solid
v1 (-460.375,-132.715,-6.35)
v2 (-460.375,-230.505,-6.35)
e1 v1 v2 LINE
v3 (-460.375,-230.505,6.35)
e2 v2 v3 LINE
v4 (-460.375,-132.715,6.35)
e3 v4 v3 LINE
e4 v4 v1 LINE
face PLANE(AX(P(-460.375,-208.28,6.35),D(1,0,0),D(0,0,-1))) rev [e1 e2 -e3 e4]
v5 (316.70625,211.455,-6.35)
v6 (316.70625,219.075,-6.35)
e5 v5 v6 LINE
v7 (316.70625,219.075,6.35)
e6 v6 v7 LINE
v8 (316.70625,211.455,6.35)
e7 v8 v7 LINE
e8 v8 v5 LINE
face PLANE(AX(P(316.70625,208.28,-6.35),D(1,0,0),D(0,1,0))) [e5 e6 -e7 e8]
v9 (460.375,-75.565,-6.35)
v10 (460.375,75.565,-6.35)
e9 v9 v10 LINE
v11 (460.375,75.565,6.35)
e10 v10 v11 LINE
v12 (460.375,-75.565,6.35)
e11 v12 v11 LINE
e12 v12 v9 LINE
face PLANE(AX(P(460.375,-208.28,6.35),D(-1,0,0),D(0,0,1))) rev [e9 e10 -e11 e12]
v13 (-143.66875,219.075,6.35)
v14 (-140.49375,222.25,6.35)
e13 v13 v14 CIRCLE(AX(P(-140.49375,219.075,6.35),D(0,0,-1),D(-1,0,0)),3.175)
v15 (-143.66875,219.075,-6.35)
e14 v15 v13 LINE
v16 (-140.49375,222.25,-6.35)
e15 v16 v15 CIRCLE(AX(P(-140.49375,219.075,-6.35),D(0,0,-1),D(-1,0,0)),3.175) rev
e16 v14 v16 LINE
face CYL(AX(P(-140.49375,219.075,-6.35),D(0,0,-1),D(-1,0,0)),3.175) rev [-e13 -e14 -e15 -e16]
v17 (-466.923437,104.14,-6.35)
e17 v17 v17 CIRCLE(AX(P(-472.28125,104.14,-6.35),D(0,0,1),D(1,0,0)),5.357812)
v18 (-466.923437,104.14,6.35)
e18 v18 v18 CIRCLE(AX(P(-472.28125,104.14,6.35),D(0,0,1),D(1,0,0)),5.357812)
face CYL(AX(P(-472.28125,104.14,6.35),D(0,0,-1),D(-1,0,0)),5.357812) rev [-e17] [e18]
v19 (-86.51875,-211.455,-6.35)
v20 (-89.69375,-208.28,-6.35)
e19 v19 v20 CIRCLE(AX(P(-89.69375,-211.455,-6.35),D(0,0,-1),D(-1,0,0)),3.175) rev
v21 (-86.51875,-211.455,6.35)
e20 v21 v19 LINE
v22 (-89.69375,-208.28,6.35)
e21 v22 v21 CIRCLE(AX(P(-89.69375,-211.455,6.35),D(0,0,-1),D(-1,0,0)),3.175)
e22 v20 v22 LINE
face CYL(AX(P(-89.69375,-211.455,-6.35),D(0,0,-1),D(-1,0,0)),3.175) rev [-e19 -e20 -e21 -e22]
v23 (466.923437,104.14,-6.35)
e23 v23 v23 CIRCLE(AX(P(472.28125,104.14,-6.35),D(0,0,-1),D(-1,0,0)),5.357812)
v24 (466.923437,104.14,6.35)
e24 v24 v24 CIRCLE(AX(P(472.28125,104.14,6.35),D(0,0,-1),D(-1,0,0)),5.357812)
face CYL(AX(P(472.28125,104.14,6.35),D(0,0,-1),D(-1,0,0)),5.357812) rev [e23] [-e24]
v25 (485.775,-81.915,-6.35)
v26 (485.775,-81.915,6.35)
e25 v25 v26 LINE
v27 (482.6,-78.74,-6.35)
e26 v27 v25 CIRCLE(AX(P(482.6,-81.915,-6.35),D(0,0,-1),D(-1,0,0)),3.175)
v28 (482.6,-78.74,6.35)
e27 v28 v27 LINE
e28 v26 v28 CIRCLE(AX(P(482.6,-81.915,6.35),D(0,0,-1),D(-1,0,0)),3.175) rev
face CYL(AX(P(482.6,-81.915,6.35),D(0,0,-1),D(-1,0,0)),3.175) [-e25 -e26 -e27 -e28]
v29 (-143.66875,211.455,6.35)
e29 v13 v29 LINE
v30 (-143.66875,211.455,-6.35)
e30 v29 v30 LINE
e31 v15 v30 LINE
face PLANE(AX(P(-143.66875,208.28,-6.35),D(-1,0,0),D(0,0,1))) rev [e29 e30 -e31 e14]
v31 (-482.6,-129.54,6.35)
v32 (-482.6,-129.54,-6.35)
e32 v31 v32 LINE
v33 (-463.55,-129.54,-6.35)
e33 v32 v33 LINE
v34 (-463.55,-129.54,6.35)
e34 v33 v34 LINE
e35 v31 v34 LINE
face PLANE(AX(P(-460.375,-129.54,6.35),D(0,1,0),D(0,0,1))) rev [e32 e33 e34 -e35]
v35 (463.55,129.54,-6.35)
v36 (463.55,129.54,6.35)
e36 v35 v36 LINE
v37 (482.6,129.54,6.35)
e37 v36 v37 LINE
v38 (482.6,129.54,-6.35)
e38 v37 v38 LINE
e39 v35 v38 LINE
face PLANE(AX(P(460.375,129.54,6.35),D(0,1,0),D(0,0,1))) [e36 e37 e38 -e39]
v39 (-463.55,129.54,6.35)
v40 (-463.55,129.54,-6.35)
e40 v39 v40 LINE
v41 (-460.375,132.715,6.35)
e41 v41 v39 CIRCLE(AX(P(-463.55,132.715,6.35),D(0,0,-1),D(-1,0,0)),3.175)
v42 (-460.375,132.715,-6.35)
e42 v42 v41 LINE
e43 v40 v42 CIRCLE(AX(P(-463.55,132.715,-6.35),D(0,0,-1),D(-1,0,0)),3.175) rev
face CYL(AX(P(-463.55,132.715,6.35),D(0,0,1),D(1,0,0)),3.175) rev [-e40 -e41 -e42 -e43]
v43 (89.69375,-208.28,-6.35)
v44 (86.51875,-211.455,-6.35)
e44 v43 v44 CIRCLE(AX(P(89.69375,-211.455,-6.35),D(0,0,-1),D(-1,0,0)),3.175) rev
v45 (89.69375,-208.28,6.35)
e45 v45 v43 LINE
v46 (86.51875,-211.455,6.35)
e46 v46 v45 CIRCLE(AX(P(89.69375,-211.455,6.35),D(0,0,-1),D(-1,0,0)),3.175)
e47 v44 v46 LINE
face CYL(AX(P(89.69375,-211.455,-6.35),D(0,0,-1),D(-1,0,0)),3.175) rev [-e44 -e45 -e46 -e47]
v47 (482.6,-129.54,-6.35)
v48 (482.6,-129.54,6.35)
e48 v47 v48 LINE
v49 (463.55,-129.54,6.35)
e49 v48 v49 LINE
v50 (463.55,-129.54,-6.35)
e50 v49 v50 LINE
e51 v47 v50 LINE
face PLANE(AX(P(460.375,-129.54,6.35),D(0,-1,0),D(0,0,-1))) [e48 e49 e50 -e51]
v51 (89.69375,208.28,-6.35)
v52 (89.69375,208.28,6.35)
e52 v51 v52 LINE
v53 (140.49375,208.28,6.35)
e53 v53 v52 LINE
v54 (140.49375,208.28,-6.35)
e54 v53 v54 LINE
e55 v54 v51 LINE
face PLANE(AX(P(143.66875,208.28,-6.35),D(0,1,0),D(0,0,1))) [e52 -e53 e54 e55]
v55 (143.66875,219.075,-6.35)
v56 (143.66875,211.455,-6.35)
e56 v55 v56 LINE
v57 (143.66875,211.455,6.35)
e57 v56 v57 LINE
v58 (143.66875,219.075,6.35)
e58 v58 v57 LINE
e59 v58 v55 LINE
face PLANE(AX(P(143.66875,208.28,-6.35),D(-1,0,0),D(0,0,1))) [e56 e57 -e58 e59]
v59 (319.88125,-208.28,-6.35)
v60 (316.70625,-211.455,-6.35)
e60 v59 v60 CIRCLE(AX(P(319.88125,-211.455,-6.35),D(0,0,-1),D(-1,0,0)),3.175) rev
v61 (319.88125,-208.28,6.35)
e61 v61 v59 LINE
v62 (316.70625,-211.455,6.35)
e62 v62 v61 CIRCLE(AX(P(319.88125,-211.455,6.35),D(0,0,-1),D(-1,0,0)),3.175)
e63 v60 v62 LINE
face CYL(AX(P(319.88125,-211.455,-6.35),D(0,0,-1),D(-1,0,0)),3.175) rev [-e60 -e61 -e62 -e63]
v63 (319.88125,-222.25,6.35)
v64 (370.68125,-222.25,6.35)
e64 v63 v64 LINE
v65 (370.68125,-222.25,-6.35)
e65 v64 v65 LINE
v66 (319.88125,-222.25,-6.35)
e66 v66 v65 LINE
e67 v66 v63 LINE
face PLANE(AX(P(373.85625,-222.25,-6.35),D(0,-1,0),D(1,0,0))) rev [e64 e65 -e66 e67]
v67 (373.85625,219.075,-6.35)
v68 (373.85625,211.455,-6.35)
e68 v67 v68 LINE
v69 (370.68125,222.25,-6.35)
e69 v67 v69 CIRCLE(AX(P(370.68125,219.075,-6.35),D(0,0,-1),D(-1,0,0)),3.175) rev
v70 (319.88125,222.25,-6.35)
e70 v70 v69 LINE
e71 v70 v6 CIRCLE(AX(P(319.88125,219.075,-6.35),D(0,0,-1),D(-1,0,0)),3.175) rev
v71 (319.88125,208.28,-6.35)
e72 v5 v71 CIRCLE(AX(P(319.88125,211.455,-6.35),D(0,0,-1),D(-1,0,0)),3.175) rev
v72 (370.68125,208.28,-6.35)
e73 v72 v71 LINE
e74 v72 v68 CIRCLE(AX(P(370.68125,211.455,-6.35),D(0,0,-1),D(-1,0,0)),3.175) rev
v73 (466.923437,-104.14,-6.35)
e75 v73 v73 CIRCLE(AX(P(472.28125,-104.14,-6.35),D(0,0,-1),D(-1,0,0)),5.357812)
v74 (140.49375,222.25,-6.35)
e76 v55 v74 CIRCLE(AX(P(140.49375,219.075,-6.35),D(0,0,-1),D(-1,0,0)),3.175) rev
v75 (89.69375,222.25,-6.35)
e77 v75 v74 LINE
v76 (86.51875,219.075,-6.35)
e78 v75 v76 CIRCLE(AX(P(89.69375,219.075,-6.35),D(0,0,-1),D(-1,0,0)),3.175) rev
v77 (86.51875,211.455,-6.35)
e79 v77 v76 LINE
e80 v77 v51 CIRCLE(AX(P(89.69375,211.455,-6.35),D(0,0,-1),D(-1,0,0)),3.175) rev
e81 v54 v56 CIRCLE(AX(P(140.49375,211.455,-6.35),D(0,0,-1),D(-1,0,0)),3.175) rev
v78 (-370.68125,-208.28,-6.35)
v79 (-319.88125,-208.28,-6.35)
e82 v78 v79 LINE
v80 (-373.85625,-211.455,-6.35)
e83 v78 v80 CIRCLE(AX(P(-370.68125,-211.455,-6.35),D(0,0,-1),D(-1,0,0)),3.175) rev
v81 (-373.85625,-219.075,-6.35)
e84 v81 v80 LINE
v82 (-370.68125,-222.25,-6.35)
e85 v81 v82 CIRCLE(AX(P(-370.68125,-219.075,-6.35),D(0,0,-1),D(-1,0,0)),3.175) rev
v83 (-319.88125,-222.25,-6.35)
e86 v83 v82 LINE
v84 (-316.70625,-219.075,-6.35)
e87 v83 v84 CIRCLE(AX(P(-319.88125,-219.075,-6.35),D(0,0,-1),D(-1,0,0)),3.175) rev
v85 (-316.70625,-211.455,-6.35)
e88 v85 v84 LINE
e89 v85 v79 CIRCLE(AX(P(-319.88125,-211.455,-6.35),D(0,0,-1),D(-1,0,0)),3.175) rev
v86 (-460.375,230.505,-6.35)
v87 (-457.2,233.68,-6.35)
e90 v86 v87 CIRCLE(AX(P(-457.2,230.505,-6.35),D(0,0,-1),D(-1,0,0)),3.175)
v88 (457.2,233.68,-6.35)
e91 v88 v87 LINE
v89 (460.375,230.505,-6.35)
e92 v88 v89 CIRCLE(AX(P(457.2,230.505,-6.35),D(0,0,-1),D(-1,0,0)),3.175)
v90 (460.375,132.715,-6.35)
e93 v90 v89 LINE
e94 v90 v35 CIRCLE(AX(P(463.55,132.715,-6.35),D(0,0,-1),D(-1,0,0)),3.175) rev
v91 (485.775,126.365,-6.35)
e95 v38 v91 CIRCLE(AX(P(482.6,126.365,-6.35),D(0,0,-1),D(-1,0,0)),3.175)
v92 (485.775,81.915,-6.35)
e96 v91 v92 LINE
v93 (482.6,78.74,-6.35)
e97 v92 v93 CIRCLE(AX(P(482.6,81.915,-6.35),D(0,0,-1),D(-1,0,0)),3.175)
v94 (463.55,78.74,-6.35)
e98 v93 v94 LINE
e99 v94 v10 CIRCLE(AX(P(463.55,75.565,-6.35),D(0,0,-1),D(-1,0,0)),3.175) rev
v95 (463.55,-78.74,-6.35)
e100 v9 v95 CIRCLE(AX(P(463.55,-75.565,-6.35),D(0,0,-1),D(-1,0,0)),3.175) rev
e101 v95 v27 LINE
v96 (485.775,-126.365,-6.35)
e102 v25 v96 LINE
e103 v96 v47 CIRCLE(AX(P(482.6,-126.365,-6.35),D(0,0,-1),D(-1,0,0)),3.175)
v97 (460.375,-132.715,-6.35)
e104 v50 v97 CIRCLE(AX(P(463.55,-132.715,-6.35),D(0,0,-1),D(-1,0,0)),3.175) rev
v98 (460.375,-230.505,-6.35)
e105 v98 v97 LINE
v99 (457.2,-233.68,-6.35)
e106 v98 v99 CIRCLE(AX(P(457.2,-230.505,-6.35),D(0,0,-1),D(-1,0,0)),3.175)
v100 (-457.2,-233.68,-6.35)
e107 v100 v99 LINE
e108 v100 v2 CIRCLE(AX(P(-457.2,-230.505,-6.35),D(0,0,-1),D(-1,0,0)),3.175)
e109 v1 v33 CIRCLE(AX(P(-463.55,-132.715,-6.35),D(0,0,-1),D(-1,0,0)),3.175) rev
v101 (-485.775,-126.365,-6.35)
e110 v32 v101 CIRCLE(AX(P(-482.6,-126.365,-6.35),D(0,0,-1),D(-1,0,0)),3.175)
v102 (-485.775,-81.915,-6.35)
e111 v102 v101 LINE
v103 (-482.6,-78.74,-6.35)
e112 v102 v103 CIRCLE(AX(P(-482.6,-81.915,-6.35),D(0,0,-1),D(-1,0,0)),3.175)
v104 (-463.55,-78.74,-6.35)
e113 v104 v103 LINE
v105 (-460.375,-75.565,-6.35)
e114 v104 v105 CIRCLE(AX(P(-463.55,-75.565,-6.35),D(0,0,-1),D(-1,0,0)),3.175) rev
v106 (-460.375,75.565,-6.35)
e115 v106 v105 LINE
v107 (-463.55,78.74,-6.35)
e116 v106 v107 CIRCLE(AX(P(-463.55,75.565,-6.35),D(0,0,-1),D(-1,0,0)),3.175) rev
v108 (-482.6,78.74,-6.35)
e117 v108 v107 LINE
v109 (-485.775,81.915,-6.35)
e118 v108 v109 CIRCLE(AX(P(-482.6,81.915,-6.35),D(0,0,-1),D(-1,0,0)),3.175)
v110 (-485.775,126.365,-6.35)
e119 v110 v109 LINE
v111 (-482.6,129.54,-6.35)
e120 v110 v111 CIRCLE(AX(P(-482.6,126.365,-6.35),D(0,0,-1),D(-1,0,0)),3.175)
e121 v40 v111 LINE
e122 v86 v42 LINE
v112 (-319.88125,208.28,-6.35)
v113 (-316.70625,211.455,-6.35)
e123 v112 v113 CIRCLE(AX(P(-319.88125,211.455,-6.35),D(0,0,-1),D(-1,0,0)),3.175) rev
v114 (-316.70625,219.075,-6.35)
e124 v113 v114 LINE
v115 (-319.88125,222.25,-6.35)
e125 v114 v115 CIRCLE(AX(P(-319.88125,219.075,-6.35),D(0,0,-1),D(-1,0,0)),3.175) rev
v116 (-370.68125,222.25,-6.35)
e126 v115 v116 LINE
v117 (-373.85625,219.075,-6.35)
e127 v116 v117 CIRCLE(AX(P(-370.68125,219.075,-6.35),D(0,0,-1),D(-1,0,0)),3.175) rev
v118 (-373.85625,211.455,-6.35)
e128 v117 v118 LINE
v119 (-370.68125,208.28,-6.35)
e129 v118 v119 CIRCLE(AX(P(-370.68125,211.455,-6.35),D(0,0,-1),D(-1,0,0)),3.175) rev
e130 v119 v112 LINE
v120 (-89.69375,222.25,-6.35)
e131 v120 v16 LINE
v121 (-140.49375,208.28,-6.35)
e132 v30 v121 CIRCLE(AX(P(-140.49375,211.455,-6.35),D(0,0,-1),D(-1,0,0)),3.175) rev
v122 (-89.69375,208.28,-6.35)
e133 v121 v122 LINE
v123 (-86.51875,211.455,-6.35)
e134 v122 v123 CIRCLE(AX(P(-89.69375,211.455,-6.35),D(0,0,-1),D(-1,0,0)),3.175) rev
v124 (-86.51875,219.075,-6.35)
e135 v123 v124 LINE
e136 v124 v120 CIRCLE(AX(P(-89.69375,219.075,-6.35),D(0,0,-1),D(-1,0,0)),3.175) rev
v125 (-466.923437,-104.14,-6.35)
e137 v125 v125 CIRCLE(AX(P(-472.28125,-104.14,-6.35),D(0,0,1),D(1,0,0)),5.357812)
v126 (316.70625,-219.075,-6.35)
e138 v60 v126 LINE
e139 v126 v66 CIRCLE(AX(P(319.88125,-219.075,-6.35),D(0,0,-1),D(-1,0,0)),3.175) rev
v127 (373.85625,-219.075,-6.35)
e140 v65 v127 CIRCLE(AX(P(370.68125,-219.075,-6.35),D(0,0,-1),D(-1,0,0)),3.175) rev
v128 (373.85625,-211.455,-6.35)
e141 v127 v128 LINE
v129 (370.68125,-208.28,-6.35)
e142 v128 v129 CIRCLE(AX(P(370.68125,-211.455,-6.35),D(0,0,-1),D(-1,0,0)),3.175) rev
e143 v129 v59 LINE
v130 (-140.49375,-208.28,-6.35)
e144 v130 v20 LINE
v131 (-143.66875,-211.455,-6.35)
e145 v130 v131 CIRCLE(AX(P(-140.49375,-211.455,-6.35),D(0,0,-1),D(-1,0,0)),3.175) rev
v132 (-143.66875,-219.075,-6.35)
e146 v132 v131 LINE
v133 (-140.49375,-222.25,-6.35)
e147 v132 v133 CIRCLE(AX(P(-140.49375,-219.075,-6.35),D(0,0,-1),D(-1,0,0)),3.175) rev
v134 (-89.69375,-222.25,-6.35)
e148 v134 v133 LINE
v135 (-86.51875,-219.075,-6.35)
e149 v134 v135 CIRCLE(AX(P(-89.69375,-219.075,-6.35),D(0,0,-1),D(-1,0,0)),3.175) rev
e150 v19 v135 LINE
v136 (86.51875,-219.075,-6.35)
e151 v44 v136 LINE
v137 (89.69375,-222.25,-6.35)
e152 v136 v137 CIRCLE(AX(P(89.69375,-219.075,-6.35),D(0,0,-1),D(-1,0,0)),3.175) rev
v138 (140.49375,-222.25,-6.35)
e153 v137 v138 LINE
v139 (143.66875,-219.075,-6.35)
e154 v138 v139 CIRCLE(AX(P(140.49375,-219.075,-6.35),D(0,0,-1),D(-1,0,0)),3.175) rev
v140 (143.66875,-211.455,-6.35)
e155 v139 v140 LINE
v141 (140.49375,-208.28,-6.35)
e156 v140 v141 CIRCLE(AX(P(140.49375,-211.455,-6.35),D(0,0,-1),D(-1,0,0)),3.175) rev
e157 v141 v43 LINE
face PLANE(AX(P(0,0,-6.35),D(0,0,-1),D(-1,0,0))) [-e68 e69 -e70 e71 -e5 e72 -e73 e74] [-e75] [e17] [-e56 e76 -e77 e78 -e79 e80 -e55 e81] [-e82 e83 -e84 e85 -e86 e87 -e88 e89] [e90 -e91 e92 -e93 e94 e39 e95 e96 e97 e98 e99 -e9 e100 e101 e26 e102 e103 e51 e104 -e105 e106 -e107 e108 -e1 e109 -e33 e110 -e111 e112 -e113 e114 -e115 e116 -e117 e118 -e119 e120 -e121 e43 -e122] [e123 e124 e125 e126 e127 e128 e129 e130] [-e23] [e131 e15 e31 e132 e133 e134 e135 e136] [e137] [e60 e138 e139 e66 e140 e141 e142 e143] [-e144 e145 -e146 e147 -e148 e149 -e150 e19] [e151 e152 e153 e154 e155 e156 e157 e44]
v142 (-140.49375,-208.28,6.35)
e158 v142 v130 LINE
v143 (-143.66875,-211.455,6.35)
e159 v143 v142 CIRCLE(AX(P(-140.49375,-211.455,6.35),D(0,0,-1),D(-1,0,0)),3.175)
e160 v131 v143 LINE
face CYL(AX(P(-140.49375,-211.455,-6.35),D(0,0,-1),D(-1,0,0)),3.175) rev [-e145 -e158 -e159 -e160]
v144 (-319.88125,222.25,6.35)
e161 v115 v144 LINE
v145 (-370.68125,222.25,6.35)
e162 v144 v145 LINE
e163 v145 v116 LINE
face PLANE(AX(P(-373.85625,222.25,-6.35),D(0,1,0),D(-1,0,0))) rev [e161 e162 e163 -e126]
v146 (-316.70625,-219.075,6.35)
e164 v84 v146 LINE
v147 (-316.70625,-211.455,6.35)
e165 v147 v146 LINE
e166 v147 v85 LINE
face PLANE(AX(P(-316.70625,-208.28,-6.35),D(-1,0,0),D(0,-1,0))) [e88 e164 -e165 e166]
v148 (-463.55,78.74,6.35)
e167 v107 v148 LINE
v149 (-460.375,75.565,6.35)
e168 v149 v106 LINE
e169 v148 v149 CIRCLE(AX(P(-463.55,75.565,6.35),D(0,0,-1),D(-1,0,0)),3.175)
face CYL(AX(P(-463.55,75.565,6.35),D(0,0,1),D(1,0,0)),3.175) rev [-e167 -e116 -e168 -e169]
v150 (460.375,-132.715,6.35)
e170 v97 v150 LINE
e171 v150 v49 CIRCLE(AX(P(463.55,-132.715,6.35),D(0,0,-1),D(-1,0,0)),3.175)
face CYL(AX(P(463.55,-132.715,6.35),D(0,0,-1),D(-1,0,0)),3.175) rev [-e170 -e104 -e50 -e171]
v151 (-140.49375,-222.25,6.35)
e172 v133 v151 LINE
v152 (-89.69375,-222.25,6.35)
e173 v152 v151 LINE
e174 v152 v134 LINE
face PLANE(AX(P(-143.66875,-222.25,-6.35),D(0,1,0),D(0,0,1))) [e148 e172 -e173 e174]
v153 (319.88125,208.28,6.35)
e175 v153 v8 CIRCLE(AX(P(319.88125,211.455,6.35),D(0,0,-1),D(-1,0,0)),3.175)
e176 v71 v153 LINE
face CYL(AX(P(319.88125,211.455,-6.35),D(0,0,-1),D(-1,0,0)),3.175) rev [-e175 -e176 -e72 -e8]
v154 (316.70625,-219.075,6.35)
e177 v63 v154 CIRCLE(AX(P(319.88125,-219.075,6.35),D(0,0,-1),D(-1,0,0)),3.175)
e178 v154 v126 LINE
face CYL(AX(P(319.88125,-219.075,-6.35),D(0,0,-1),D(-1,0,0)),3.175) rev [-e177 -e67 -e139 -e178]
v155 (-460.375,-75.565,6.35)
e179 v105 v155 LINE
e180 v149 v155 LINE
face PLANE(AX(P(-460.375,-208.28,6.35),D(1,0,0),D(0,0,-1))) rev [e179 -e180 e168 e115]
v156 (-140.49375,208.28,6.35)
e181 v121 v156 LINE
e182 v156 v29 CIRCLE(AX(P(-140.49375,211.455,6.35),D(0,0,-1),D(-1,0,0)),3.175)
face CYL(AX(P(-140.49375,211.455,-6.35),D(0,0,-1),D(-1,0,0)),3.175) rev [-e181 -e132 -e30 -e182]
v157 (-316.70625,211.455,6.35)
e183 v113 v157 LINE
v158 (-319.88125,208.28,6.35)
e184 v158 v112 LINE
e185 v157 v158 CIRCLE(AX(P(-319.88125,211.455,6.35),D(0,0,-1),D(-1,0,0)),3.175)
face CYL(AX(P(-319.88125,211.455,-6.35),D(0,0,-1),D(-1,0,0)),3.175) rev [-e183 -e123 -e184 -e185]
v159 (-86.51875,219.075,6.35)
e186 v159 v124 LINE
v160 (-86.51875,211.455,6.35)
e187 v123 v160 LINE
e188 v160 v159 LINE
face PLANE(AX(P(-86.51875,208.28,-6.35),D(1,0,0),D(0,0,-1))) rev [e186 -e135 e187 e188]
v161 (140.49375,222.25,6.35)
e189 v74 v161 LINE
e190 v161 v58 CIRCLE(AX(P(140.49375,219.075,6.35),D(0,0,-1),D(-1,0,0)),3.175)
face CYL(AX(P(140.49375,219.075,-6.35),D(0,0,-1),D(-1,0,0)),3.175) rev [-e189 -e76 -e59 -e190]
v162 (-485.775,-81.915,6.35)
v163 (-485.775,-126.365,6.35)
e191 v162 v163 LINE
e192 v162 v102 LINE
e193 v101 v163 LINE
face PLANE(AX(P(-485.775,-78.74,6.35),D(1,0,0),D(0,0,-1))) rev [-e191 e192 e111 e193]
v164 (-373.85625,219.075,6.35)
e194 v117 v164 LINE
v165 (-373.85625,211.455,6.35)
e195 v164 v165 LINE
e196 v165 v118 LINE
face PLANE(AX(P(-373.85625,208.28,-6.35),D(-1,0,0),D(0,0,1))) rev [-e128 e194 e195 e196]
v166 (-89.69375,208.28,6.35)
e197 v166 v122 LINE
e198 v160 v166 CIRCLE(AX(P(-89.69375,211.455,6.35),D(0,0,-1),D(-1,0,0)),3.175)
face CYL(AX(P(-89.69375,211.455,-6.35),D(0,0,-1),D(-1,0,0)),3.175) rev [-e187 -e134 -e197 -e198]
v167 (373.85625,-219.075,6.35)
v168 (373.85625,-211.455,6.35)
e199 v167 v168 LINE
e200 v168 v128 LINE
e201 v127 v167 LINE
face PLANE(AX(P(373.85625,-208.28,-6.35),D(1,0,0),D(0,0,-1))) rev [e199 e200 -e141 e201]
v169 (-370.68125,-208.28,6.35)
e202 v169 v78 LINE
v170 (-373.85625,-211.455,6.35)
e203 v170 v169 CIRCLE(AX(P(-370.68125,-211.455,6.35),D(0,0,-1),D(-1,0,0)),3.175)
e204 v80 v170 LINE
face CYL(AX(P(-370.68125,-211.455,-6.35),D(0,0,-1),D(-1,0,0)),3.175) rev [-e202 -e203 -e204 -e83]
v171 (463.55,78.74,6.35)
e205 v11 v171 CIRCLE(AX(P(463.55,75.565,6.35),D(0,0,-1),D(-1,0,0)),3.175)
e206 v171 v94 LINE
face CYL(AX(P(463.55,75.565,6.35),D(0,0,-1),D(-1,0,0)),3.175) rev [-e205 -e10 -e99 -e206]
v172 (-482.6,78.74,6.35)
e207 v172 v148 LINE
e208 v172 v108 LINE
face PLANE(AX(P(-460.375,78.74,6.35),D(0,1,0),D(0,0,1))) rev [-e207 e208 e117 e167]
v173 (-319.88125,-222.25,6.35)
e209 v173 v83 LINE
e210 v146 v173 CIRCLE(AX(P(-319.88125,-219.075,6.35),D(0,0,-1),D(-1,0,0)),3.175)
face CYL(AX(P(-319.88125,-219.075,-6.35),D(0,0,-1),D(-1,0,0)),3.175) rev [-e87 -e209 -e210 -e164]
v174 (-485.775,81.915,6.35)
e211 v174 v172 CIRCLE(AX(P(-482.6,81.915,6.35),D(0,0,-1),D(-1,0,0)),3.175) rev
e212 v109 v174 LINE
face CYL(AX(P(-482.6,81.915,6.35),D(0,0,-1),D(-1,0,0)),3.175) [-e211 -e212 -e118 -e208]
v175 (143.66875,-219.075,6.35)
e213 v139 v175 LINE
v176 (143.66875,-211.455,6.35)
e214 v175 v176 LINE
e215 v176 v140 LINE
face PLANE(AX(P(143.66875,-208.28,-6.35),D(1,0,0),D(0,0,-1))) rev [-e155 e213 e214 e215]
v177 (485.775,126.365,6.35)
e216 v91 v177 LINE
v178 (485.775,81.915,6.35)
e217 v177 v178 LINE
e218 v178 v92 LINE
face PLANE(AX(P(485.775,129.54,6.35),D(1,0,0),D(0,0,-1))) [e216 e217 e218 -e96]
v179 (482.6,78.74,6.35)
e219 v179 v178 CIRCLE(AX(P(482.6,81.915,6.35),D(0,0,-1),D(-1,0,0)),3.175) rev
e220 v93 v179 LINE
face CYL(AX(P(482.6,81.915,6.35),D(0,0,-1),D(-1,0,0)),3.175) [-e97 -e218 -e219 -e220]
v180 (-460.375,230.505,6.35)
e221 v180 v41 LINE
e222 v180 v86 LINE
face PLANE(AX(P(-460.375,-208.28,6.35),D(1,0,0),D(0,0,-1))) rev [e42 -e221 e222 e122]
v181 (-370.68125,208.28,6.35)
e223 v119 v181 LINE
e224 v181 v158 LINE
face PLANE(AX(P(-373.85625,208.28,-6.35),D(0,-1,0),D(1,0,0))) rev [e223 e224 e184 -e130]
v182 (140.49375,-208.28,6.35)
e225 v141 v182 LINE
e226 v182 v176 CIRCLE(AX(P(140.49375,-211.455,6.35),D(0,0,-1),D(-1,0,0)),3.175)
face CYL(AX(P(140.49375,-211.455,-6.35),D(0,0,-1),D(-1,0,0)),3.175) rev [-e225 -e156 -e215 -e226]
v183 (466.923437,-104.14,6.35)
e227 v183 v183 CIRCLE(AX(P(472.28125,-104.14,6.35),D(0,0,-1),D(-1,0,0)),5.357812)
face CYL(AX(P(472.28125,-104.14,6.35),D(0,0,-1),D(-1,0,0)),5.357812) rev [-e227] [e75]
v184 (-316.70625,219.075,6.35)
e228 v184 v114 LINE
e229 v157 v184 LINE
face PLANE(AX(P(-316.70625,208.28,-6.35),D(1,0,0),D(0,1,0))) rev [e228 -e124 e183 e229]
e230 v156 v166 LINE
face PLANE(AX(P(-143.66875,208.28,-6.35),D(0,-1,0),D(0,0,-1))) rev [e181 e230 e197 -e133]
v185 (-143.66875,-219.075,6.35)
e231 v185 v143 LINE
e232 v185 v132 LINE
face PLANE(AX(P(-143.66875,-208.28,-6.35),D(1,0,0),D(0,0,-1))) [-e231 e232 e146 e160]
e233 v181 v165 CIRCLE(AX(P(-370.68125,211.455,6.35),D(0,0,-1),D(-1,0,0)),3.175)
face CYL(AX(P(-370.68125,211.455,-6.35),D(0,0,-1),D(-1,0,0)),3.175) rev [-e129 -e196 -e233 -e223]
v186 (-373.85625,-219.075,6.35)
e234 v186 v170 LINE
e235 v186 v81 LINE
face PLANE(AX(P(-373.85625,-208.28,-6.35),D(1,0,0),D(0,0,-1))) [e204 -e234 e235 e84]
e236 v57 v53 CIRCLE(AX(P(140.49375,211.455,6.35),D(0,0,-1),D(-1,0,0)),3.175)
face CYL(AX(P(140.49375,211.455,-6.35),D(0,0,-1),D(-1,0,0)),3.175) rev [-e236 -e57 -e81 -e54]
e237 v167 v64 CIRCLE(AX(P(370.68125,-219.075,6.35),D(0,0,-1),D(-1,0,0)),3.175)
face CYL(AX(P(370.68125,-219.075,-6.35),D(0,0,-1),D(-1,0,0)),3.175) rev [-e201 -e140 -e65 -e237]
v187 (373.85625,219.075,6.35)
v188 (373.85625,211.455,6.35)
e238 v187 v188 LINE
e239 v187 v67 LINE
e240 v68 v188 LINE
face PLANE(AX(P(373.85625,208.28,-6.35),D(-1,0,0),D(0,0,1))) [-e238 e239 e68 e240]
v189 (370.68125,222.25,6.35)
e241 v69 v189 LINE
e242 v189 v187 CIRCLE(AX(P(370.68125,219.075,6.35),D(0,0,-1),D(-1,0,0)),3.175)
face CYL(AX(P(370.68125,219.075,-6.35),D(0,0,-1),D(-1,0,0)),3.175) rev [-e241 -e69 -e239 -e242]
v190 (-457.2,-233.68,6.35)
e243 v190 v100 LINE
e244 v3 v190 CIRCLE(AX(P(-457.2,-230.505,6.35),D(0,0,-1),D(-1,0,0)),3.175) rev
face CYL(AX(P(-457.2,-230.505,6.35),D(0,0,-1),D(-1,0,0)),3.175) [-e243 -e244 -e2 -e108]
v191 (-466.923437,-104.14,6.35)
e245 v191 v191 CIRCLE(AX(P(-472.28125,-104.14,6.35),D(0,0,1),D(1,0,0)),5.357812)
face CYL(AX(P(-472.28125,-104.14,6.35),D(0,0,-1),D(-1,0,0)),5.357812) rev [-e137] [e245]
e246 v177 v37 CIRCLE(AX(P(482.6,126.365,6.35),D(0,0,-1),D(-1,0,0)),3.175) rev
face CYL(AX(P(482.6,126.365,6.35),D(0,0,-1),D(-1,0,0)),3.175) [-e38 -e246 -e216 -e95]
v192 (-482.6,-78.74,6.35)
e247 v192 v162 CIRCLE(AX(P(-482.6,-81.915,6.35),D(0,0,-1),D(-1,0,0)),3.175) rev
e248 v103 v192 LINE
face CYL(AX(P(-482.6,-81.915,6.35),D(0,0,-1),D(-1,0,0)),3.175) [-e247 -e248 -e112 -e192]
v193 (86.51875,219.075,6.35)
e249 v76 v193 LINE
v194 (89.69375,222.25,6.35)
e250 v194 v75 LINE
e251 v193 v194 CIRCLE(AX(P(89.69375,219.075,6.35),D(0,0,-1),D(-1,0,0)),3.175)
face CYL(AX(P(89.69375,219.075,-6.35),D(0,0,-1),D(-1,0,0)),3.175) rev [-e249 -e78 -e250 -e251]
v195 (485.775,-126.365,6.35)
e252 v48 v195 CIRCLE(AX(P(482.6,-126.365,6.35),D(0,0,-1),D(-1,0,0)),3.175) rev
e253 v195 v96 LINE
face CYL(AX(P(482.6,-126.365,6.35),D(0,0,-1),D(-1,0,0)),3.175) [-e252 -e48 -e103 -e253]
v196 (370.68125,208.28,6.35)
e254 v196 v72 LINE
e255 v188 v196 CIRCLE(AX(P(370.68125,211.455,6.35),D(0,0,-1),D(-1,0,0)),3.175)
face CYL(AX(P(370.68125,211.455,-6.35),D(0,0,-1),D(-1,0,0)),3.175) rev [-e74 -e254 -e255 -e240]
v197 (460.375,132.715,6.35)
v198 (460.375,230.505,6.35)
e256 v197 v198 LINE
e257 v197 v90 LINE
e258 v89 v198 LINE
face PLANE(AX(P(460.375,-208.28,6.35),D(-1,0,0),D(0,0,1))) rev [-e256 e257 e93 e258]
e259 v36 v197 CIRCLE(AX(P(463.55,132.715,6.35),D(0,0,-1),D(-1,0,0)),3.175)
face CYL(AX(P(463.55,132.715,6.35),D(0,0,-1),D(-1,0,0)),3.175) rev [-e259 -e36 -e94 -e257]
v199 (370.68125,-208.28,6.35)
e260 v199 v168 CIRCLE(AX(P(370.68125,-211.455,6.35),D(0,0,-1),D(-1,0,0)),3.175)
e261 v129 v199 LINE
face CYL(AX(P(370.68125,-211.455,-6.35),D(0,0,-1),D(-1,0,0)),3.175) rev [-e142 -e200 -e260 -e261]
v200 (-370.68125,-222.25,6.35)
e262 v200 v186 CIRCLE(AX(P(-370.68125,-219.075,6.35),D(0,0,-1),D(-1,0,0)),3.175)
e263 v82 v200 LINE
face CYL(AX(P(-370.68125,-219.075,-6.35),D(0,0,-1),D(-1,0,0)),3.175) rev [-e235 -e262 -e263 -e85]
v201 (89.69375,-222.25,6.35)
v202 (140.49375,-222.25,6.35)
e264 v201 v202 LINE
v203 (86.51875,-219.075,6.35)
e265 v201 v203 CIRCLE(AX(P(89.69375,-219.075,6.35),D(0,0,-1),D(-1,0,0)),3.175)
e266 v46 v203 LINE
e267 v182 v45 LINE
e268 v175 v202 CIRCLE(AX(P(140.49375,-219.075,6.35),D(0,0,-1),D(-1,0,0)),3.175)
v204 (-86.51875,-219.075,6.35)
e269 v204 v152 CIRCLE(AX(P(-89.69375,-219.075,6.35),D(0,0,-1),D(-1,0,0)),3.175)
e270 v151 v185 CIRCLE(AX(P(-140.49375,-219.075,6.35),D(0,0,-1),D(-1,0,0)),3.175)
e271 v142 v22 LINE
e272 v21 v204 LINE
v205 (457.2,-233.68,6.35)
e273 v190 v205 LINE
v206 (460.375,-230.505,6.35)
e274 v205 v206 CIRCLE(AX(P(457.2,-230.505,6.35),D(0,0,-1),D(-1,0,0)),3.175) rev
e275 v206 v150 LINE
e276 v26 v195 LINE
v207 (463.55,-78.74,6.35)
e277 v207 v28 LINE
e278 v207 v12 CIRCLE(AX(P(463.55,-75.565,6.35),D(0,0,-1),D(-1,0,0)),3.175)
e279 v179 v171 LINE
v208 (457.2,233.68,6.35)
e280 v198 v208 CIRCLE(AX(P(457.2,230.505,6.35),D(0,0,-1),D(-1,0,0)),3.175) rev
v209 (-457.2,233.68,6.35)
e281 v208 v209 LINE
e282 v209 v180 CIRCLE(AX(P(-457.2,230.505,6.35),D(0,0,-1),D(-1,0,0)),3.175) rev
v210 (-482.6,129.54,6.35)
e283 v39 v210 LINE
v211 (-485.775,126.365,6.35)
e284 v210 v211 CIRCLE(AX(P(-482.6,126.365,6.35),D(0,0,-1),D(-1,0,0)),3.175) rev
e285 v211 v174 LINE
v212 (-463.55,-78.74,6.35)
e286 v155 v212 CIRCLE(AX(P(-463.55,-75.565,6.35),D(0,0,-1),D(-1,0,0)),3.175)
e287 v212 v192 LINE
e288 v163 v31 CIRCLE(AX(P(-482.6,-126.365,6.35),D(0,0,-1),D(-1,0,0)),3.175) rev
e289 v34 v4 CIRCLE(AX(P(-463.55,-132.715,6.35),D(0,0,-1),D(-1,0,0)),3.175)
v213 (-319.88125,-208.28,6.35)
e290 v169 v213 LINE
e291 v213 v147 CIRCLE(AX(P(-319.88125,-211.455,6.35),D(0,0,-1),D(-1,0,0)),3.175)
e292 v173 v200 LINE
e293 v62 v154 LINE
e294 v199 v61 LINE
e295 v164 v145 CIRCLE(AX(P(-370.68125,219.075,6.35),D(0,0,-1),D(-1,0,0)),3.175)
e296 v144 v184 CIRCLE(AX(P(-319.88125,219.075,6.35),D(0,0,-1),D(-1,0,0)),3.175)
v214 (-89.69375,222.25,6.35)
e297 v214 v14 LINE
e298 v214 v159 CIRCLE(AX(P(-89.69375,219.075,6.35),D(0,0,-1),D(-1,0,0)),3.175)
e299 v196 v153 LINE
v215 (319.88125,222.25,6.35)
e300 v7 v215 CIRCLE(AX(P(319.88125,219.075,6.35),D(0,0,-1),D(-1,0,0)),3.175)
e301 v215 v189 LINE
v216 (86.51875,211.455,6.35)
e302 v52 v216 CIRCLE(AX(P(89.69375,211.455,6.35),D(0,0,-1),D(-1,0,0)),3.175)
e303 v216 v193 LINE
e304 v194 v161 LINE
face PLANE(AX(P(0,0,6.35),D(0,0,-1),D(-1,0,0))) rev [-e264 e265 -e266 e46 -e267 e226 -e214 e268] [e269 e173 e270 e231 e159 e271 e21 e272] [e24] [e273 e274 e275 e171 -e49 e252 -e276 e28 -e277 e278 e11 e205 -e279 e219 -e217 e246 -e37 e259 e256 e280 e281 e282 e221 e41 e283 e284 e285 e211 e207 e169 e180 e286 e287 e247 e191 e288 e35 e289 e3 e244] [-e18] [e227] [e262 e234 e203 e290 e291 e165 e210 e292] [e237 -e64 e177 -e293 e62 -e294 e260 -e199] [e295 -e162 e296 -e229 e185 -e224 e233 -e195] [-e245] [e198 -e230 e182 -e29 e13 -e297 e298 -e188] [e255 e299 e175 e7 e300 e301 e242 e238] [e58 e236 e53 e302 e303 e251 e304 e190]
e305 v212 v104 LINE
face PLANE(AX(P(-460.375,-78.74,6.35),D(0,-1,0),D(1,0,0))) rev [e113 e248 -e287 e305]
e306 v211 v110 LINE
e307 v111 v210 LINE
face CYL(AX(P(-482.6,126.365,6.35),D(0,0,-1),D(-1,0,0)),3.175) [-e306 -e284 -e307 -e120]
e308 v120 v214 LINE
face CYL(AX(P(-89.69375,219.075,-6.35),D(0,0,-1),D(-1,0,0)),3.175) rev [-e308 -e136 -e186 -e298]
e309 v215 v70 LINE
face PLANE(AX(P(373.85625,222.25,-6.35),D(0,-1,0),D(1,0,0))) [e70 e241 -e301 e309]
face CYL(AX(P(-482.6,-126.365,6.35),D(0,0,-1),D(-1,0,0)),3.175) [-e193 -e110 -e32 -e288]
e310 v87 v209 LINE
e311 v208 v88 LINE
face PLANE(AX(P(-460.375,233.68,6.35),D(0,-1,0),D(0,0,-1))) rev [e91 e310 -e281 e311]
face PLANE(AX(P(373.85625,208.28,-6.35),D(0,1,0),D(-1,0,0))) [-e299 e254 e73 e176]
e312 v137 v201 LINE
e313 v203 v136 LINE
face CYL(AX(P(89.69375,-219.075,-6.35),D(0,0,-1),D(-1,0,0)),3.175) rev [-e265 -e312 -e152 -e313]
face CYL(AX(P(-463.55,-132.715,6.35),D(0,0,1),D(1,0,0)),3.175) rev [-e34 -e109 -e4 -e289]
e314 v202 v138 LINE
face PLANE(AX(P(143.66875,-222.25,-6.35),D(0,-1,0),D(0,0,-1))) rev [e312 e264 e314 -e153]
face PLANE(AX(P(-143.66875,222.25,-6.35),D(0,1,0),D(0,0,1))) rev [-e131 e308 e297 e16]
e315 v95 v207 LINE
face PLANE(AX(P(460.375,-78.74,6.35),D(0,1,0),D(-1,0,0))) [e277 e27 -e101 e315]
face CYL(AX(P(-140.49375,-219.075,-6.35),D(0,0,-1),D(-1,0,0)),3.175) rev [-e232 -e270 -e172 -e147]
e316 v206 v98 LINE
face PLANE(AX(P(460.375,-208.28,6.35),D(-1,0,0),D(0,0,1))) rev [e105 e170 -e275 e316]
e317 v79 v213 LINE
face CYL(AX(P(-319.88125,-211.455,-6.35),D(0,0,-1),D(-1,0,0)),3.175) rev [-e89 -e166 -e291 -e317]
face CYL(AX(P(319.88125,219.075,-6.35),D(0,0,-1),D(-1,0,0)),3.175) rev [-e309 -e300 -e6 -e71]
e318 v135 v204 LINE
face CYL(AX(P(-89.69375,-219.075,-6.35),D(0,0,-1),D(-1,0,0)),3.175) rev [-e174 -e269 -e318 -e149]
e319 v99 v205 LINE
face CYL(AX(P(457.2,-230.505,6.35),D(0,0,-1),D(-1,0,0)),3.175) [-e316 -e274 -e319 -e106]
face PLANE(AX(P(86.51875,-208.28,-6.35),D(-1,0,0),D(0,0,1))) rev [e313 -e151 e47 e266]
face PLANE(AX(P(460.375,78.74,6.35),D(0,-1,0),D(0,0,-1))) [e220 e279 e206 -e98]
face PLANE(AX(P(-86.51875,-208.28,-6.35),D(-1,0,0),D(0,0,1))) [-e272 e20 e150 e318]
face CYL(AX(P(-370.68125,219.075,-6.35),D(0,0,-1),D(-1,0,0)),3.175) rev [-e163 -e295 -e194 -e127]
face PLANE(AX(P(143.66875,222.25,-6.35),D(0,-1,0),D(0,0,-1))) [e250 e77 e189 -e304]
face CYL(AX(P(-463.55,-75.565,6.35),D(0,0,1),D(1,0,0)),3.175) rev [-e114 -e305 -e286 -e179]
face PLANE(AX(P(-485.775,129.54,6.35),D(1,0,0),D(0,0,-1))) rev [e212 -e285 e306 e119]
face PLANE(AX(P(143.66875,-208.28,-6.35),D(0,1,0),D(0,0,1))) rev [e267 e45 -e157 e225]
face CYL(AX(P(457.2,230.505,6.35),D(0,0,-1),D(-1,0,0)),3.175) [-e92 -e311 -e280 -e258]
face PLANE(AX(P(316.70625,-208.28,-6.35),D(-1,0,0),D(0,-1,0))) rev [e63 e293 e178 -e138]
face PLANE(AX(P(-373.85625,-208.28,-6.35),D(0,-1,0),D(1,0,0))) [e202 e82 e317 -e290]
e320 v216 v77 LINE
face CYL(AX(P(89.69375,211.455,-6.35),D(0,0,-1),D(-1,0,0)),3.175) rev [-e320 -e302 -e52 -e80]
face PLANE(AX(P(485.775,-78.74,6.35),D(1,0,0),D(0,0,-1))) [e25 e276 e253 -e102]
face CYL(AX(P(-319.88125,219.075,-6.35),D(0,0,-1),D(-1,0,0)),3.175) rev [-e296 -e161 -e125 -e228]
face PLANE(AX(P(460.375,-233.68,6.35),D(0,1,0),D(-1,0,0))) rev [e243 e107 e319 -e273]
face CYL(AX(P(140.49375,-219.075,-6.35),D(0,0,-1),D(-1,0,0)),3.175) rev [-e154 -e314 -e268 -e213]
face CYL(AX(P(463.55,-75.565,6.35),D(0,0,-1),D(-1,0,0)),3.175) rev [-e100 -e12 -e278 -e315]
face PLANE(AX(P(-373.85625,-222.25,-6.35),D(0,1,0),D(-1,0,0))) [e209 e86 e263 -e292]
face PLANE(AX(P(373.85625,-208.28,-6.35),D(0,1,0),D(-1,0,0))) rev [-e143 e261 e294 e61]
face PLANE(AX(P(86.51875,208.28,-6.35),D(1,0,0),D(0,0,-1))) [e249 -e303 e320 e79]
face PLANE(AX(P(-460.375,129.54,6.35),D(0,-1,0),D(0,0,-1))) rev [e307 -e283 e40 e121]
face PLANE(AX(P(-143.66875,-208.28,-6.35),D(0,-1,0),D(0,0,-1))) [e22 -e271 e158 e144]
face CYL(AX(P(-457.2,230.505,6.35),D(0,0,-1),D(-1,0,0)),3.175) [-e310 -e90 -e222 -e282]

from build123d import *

# Parameters (mm, degrees)
SKETCH1_W            = 920.75
SKETCH1_H            = 416.56
BOSS_EXTRUDE1_DEPTH  = 6.35
SKETCH2_W            = 920.75
SKETCH2_H            = 25.4
BOSS_EXTRUDE2_DEPTH  = 6.35
SKETCH3_W            = 57.15
SKETCH3_H            = 13.97
TAB_HOLES_DEPTH      = 517.442419854
SKETCH4_W            = 25.4
SKETCH4_H            = 50.8
SKETCH4_R            = 5.3578125
TABS_DEPTH           = 6.35
FILLET1_R            = 3.175
FILLET2_R            = 3.175
FILLET2_OF_MIRROR2_R = 3.175
MIRROR4_START        = -6.35
MIRROR4_DEPTH        = 12.7
MIRROR4_2_OUTLINE_R  = 5.3578125
MIRROR4_2_DEPTH      = 12.7
FILLET3_R            = 3.175


# Read off the part's stored shape, not the designer's step: Mirror4
with BuildPart() as part:
    # Sketch1 → Boss-Extrude1 (new, symmetric)
    with BuildSketch(Plane.XY):
        Rectangle(SKETCH1_W, SKETCH1_H)
    extrude(amount=BOSS_EXTRUDE1_DEPTH, both=True)

    # Sketch2 → Boss-Extrude2 (add, symmetric)
    with BuildSketch(Plane.XY):
        with Locations((0, 220.98)):
            Rectangle(SKETCH2_W, SKETCH2_H)
        with Locations((0, -220.98)):
            Rectangle(SKETCH2_W, SKETCH2_H)
    extrude(amount=BOSS_EXTRUDE2_DEPTH, both=True)

    # Sketch3 → Tab Holes (cut, through all)
    with BuildSketch(Plane.XY.offset(6.35)):
        with Locations((-345.28125, 215.265)):
            Rectangle(SKETCH3_W, SKETCH3_H)
        with Locations((-115.09375, 215.265)):
            Rectangle(SKETCH3_W, SKETCH3_H)
    tab_holes = extrude(amount=-TAB_HOLES_DEPTH, mode=Mode.SUBTRACT)

    # Sketch4 → Tabs (add, symmetric)
    # profile 1 of 2: a face of its own
    with BuildSketch(Plane.XY):
        with Locations((-473.075, 104.14)):
            Rectangle(SKETCH4_W, SKETCH4_H)
        with Locations((-472.28125, 104.14)):
            Circle(SKETCH4_R, mode=Mode.SUBTRACT)
    # profile 2 of 2: a face of its own
    with BuildSketch(Plane.XY):
        with Locations((-473.075, -104.14)):
            Rectangle(SKETCH4_W, SKETCH4_H)
        with Locations((-472.28125, -104.14)):
            Circle(SKETCH4_R, mode=Mode.SUBTRACT)
    extrude(amount=TABS_DEPTH, both=True)

    # Fillet1
    fillet1_edges = [part.edges().sort_by_distance(p)[0] for p in [
        (-460.375, 233.68, 0),
        (-460.375, -233.68, 0),
        (-460.375, 78.74, 0),
        (-460.375, 129.54, 0),
        (-485.775, 129.54, 0),
        (-485.775, 78.74, 0),
        (-460.375, -129.54, 0),
        (-460.375, -78.74, 0),
        (-485.775, -78.74, 0),
        (-485.775, -129.54, 0),
    ]]
    fillet(fillet1_edges, radius=FILLET1_R)

    # Fillet2
    fillet2_edges = [part.edges().sort_by_distance(p)[0] for p in [
        (-373.85625, 208.28, 0),
        (-373.85625, 222.25, 0),
        (-316.70625, 222.25, 0),
        (-316.70625, 208.28, 0),
        (-143.66875, 208.28, 0),
        (-143.66875, 222.25, 0),
        (-86.51875, 222.25, 0),
        (-86.51875, 208.28, 0),
    ]]
    fillet(fillet2_edges, radius=FILLET2_R)

    # Mirror2: Tab Holes across plane
    add(tab_holes.mirror(Plane.ZX), mode=Mode.SUBTRACT)

    # Fillet2 of Mirror2
    fillet2_of_mirror2_edges = [part.edges().sort_by_distance(p)[0] for p in [
        (-373.85625, -208.28, 0),
        (-373.85625, -222.25, 0),
        (-316.70625, -222.25, 0),
        (-316.70625, -208.28, 0),
        (-143.66875, -208.28, 0),
        (-143.66875, -222.25, 0),
        (-86.51875, -222.25, 0),
        (-86.51875, -208.28, 0),
    ]]
    fillet(fillet2_of_mirror2_edges, radius=FILLET2_OF_MIRROR2_R)

    # Mirror4 outline → Mirror4 (cut)
    with BuildSketch(Plane.XY.offset(MIRROR4_START)):
        with BuildLine():
            Line((140.49375, 222.25), (89.69375, 222.25))
            ThreePointArc((89.69375, 222.25), (87.44868597, 221.32006403), (86.51875, 219.075))
            Line((86.51875, 219.075), (86.51875, 211.455))
            ThreePointArc((86.51875, 211.455), (87.44868597, 209.20993597), (89.69375, 208.28))
            Line((89.69375, 208.28), (140.49375, 208.28))
            ThreePointArc((140.49375, 208.28), (142.73881403, 209.20993597), (143.66875, 211.455))
            Line((143.66875, 211.455), (143.66875, 219.075))
            ThreePointArc((143.66875, 219.075), (142.73881403, 221.32006403), (140.49375, 222.25))
        make_face()
        with BuildLine():
            Line((370.68125, 222.25), (319.88125, 222.25))
            ThreePointArc((319.88125, 222.25), (317.63618597, 221.32006403), (316.70625, 219.075))
            Line((316.70625, 219.075), (316.70625, 211.455))
            ThreePointArc((316.70625, 211.455), (317.63618597, 209.20993597), (319.88125, 208.28))
            Line((319.88125, 208.28), (370.68125, 208.28))
            ThreePointArc((370.68125, 208.28), (372.92631403, 209.20993597), (373.85625, 211.455))
            Line((373.85625, 211.455), (373.85625, 219.075))
            ThreePointArc((373.85625, 219.075), (372.92631403, 221.32006403), (370.68125, 222.25))
        make_face()
        with BuildLine():
            ThreePointArc((143.66875, -211.455), (142.73881403, -209.20993597), (140.49375, -208.28))
            Line((140.49375, -208.28), (89.69375, -208.28))
            ThreePointArc((89.69375, -208.28), (87.44868597, -209.20993597), (86.51875, -211.455))
            Line((86.51875, -211.455), (86.51875, -219.075))
            ThreePointArc((86.51875, -219.075), (87.44868597, -221.32006403), (89.69375, -222.25))
            Line((89.69375, -222.25), (140.49375, -222.25))
            ThreePointArc((140.49375, -222.25), (142.73881403, -221.32006403), (143.66875, -219.075))
            Line((143.66875, -219.075), (143.66875, -211.455))
        make_face()
        with BuildLine():
            ThreePointArc((373.85625, -211.455), (372.92631403, -209.20993597), (370.68125, -208.28))
            Line((370.68125, -208.28), (319.88125, -208.28))
            ThreePointArc((319.88125, -208.28), (317.63618597, -209.20993597), (316.70625, -211.455))
            Line((316.70625, -211.455), (316.70625, -219.075))
            ThreePointArc((316.70625, -219.075), (317.63618597, -221.32006403), (319.88125, -222.25))
            Line((319.88125, -222.25), (370.68125, -222.25))
            ThreePointArc((370.68125, -222.25), (372.92631403, -221.32006403), (373.85625, -219.075))
            Line((373.85625, -219.075), (373.85625, -211.455))
        make_face()
    extrude(amount=MIRROR4_DEPTH, mode=Mode.SUBTRACT)

    # Mirror4 2 outline → Mirror4 2 (add)
    # profile 1 of 2: a face of its own
    with BuildSketch(Plane.XY.offset(MIRROR4_START)):
        with BuildLine():
            ThreePointArc((485.775, 126.365), (484.84506403, 128.61006403), (482.6, 129.54))
            Line((482.6, 129.54), (460.375, 129.54))
            Line((460.375, 129.54), (460.375, 78.74))
            Line((460.375, 78.74), (482.6, 78.74))
            ThreePointArc((482.6, 78.74), (484.84506403, 79.66993597), (485.775, 81.915))
            Line((485.775, 81.915), (485.775, 126.365))
        make_face()
        with Locations((472.28125, 104.14)):
            Circle(MIRROR4_2_OUTLINE_R, mode=Mode.SUBTRACT)
    # profile 2 of 2: a face of its own
    with BuildSketch(Plane.XY.offset(MIRROR4_START)):
        with BuildLine():
            Line((482.6, -78.74), (460.375, -78.74))
            Line((460.375, -78.74), (460.375, -129.54))
            Line((460.375, -129.54), (482.6, -129.54))
            ThreePointArc((482.6, -129.54), (484.84506403, -128.61006403), (485.775, -126.365))
            Line((485.775, -126.365), (485.775, -81.915))
            ThreePointArc((485.775, -81.915), (484.84506403, -79.66993597), (482.6, -78.74))
        make_face()
        with Locations((472.28125, -104.14)):
            Circle(MIRROR4_2_OUTLINE_R, mode=Mode.SUBTRACT)
    extrude(amount=MIRROR4_2_DEPTH)

    # Fillet3
    fillet3_edges = [part.edges().sort_by_distance(p)[0] for p in [
        (460.375, 233.68, 0),
        (460.375, -233.68, 0),
        (460.375, 129.54, 0),
        (460.375, 78.74, 0),
        (460.375, -78.74, 0),
        (460.375, -129.54, 0),
    ]]
    fillet(fillet3_edges, radius=FILLET3_R)


solid = part.part
